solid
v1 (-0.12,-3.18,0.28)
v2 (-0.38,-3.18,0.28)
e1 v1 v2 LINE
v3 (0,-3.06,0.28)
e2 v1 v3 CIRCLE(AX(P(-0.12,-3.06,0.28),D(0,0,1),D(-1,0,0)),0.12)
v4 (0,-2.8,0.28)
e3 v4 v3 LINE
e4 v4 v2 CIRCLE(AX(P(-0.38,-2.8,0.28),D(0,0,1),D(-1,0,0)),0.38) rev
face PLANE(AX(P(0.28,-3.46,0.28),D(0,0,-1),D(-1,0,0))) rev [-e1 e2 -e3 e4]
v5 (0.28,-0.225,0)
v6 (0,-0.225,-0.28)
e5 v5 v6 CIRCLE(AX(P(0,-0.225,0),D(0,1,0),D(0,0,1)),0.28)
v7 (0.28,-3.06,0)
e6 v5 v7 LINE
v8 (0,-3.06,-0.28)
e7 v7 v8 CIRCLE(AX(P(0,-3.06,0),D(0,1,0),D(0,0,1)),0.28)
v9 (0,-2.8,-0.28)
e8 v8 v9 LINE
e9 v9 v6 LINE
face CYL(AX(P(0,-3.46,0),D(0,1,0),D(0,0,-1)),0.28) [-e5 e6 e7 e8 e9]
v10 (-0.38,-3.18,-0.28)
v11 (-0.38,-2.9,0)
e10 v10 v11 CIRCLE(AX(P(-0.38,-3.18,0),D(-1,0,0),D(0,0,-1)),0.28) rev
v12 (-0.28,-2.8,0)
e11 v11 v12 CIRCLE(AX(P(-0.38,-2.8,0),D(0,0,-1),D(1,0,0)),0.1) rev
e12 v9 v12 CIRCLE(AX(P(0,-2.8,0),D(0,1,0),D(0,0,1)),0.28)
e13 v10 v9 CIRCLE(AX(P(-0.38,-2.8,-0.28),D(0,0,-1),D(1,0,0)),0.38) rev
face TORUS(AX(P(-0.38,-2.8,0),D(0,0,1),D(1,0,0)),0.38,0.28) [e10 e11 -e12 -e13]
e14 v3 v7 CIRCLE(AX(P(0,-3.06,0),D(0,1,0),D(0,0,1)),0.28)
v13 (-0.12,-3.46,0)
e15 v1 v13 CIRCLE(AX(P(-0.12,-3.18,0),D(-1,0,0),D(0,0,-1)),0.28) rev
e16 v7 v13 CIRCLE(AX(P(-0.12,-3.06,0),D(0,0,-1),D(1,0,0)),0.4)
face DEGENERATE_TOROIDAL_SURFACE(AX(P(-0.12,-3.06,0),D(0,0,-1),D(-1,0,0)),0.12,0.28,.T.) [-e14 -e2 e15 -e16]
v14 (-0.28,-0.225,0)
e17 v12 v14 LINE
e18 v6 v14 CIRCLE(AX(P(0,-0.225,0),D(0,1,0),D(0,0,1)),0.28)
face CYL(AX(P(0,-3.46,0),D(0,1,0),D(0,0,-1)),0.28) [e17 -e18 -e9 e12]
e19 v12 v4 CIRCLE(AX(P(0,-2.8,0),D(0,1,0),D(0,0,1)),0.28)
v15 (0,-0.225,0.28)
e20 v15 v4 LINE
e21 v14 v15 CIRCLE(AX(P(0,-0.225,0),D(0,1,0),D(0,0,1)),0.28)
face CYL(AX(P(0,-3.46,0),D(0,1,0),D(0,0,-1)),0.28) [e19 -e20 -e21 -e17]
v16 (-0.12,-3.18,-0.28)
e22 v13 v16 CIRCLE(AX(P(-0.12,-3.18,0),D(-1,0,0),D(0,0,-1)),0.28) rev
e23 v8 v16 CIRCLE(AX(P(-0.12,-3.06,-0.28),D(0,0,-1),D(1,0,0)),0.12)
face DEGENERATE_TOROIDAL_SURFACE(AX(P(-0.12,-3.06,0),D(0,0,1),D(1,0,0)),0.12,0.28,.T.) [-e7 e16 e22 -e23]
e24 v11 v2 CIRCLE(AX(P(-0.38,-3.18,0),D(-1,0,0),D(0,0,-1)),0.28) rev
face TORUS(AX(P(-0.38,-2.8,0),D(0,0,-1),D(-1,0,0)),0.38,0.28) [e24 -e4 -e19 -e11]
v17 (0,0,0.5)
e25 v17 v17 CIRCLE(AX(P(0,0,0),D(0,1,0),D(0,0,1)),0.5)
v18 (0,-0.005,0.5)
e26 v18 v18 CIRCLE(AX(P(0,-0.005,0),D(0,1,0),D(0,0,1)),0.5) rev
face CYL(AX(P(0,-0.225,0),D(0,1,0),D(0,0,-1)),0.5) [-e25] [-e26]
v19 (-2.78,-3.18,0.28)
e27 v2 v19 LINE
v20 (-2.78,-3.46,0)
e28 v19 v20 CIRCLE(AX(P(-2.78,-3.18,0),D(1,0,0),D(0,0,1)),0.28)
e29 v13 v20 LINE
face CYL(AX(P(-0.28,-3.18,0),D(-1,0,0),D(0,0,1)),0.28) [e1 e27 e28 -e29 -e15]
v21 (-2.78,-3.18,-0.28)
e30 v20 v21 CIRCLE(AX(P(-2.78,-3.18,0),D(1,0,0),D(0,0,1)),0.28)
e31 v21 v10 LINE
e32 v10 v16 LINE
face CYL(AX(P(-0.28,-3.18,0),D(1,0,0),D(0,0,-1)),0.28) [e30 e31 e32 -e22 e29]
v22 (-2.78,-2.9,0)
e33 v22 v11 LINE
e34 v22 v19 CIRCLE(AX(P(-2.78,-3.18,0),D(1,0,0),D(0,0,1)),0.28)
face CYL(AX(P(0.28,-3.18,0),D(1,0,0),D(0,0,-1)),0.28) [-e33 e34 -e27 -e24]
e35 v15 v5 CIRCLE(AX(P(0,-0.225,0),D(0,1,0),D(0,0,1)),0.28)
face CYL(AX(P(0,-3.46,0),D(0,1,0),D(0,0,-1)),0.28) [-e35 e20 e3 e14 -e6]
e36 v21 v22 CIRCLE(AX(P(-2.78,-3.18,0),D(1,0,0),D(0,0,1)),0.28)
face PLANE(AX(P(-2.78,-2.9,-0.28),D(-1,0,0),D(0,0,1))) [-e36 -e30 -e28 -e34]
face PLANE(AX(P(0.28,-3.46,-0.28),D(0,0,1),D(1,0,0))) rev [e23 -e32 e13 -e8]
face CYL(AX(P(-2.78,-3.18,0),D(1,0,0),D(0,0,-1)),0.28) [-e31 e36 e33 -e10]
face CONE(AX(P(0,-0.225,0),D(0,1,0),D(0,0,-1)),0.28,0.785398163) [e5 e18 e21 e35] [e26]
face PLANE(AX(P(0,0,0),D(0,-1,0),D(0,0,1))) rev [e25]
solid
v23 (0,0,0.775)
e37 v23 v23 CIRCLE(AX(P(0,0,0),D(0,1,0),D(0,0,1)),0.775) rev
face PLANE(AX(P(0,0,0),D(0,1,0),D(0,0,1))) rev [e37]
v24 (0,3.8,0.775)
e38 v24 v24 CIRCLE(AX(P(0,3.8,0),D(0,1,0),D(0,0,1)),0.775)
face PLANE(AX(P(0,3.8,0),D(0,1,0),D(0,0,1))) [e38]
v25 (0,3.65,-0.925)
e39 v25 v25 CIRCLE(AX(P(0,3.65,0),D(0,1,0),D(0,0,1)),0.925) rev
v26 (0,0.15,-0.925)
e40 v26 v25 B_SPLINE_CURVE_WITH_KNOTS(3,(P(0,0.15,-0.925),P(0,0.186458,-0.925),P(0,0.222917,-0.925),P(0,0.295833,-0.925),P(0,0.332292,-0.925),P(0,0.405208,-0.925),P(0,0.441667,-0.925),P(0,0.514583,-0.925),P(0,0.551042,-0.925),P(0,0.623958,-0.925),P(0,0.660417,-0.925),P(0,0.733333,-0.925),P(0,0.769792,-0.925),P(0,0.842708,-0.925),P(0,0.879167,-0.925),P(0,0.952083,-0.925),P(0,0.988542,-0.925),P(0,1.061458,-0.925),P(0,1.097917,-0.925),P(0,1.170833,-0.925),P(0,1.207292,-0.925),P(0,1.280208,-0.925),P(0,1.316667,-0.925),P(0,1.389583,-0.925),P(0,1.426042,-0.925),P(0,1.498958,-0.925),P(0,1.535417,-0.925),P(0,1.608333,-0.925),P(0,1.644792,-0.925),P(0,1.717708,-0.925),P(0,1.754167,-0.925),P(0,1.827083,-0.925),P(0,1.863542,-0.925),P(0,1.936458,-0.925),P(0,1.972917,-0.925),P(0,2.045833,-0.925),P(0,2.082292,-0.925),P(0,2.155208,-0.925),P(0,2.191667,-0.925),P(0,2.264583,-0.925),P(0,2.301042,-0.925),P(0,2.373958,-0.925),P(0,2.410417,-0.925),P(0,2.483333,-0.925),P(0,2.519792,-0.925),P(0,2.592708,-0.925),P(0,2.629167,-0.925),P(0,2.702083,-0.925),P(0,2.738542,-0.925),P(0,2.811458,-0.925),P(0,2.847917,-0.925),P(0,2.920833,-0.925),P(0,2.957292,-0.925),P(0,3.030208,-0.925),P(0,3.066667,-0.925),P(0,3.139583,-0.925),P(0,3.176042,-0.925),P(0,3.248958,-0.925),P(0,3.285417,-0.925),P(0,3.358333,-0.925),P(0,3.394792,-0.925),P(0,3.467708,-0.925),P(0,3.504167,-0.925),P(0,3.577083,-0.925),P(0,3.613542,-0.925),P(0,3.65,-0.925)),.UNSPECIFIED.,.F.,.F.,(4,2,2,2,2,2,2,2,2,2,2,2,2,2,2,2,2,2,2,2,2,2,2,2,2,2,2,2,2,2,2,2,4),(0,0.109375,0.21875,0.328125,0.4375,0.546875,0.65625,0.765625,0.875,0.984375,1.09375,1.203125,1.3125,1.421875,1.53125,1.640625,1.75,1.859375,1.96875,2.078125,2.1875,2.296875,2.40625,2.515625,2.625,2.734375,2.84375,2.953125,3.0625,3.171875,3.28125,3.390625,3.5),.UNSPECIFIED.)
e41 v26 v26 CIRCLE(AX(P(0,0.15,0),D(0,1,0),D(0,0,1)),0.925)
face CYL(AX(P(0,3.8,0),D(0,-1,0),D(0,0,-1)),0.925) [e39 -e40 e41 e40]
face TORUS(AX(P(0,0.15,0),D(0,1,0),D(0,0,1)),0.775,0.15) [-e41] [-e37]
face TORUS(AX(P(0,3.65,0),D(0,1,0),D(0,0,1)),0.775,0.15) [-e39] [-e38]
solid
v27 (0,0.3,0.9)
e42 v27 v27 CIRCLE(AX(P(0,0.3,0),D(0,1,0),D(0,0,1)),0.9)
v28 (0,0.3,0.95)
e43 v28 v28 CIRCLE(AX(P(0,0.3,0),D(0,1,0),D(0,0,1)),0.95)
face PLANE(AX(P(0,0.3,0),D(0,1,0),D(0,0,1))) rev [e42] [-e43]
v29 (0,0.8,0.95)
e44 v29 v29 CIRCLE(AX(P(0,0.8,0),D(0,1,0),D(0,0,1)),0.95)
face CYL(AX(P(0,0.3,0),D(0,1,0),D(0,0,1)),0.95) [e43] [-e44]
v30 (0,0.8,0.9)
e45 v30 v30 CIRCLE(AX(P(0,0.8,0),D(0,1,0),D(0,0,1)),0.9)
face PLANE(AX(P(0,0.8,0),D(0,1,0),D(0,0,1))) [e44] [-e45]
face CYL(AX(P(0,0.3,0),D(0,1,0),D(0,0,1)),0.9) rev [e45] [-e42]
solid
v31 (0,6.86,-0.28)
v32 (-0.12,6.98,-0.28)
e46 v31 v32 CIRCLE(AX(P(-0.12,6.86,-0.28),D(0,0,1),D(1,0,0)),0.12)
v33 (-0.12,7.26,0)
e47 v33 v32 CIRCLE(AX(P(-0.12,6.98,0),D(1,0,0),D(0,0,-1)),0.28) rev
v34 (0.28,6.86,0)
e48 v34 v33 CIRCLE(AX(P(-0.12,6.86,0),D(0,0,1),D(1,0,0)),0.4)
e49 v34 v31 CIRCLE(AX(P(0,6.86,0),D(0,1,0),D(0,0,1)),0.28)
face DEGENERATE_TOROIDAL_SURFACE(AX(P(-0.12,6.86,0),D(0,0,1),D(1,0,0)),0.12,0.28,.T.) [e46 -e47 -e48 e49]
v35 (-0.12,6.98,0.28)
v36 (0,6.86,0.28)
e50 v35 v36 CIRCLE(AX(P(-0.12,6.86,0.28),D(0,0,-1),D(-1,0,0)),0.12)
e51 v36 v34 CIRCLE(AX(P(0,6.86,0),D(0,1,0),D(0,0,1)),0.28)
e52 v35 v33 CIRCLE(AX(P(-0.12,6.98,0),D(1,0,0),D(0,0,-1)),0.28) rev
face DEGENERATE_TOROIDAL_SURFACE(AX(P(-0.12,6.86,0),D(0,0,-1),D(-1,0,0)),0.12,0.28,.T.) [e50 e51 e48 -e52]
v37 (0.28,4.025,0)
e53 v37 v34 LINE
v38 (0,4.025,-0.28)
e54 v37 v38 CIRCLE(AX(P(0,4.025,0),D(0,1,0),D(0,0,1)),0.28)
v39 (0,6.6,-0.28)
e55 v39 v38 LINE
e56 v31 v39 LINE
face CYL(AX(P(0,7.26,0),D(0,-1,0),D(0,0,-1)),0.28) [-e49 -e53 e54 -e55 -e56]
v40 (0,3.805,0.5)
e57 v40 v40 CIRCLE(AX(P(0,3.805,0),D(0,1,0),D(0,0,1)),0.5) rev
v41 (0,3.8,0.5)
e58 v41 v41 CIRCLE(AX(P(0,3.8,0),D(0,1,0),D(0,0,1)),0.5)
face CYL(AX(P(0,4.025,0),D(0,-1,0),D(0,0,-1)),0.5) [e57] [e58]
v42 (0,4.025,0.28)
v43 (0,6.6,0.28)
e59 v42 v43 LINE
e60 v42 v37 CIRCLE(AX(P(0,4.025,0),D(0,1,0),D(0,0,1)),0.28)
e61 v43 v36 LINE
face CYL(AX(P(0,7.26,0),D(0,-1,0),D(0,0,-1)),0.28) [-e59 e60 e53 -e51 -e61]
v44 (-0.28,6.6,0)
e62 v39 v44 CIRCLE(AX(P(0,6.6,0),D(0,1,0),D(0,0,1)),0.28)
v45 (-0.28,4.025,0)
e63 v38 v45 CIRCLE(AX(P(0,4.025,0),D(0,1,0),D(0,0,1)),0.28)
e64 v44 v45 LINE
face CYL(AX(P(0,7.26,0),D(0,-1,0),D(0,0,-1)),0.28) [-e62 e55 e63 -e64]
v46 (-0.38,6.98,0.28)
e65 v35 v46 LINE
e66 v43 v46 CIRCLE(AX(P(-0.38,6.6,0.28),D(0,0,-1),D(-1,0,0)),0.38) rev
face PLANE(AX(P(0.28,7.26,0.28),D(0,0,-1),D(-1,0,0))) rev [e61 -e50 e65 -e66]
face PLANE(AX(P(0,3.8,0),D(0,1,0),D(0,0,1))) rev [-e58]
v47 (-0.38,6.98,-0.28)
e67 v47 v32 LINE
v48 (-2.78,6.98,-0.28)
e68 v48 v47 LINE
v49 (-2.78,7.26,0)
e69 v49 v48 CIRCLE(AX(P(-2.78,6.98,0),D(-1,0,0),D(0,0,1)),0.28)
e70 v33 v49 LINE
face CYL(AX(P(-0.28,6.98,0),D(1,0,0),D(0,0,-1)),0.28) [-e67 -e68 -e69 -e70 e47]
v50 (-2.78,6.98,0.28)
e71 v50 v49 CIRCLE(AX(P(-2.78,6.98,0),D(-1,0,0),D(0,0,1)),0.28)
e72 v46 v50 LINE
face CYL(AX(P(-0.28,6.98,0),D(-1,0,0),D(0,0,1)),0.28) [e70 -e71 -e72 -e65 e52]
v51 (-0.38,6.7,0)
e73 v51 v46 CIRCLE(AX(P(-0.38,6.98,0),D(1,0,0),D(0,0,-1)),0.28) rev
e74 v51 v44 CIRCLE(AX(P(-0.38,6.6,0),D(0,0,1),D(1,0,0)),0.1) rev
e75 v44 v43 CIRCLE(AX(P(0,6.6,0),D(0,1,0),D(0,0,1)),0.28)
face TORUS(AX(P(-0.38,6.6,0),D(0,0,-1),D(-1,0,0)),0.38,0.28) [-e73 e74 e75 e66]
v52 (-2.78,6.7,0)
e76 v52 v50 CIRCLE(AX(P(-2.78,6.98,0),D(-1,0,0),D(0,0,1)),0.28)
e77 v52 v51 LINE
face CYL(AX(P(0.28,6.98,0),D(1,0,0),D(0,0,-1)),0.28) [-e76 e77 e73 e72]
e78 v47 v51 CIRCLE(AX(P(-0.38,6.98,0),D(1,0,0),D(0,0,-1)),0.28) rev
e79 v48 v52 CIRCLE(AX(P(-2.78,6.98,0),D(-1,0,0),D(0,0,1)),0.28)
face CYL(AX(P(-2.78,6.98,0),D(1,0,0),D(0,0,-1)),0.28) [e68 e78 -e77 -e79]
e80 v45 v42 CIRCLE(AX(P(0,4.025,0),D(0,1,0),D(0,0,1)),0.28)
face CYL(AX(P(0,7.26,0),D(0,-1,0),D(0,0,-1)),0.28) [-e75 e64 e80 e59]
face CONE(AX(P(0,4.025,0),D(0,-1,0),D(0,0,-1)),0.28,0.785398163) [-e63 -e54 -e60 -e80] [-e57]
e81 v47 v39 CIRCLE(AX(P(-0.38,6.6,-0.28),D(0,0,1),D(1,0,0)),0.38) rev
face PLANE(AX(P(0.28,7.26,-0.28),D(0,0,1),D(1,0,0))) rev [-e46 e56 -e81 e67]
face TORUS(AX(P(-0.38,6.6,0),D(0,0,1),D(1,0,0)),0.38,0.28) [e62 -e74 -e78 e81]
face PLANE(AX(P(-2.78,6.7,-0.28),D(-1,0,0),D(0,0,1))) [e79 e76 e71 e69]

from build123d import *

# Parameters (mm, degrees)
SKETCH1_R           = 0.925
BOSS_EXTRUDE1_DEPTH = 3.8
SKETCH2_R           = 0.5
BOSS_EXTRUDE2_DEPTH = 0.225
CHAMFER2_SIZE       = 0.22
FILLET1_R           = 0.15
FILLET2_R           = 0.15
SKETCH8_W           = 0.56
SKETCH8_H           = 0.56
BOSS_EXTRUDE7_DEPTH = 3.235
SKETCH9_W           = 0.56
SKETCH9_H           = 0.56
BOSS_EXTRUDE8_DEPTH = 2.5
FILLET7_R           = 0.1
FILLET7_R_2         = 0.4
FILLET7_R_3         = 0.28
SKETCH10_R          = 0.95
SKETCH10_R_2        = 0.9
BOSS_EXTRUDE9_DEPTH = 0.5


with BuildPart() as part:
    # Sketch1 → Boss-Extrude1 (new body)
    with BuildSketch(Plane(origin=(0, 0, 0), x_dir=(1, 0, 0), z_dir=(0, 1, 0))):
        with Locations(Location((0, 0, 0), (0, 0, 90))):
            Circle(SKETCH1_R)
    extrude(amount=BOSS_EXTRUDE1_DEPTH)

    # Fillet1
    fillet1_edges = [part.edges().sort_by_distance(p)[0] for p in [
        (0, 3.8, 0.925),
    ]]
    fillet(fillet1_edges, radius=FILLET1_R)

    # Fillet2
    fillet2_edges = [part.edges().sort_by_distance(p)[0] for p in [
        (0, 0, 0.925),
    ]]
    fillet(fillet2_edges, radius=FILLET2_R)


with BuildPart() as body_2:
    # Sketch2 → Boss-Extrude2 (new body)
    with BuildSketch(Plane(origin=(0, 3.8, 0), x_dir=(1, 0, 0), z_dir=(0, 1, 0))):
        with Locations(Location((0, 0, 0), (0, 0, 270))):
            Circle(SKETCH2_R)
    extrude(amount=BOSS_EXTRUDE2_DEPTH)

    # Chamfer2
    chamfer2_edges = [body_2.edges().sort_by_distance(p)[0] for p in [
        (0, 4.025, -0.5),
    ]]
    chamfer(chamfer2_edges, length=CHAMFER2_SIZE)

    # Sketch8 → Boss-Extrude7 (add)
    with BuildSketch(Plane(origin=(0, 4.025, 0), x_dir=(1, 0, 0), z_dir=(0, 1, 0))):
        Rectangle(SKETCH8_W, SKETCH8_H)
    extrude(amount=BOSS_EXTRUDE7_DEPTH)

    # Sketch9 → Boss-Extrude8 (add)
    with BuildSketch(Plane.ZY.offset(0.28)):
        with Locations((0, 6.98)):
            Rectangle(SKETCH9_W, SKETCH9_H)
    extrude(amount=BOSS_EXTRUDE8_DEPTH)

    # Fillet7
    # the kernel refuses this fillet: 0.4, 0.28, 0.1 mm, written as the material it adds along each edge
    with BuildSketch(Plane(origin=(-0.28, 6.7, 0.28), x_dir=(-1, 0, 0), z_dir=(0, 0, -1))) as fillet7_piece_1:
        with BuildLine():
            CenterArc((FILLET7_R, -FILLET7_R), FILLET7_R, 90, 90)
            Line((0, -FILLET7_R), (0, 0))
            Line((0, 0), (FILLET7_R, 0))
        make_face()
    extrude(amount=0.56)
    # the kernel refuses this fillet: 0.4, 0.28, 0.1 mm, written as the material it takes off along each edge
    with BuildSketch(Plane(origin=(0.28, 7.26, -1.28), x_dir=(0, -1, 0), z_dir=(0, 0, 1))) as fillet7_2_piece_1:
        with BuildLine():
            CenterArc((FILLET7_R_2, -FILLET7_R_2), FILLET7_R_2, 90, 90)
            Line((0, -FILLET7_R_2), (0, 0))
            Line((0, 0), (FILLET7_R_2, 0))
        make_face()
    extrude(amount=2.56, mode=Mode.SUBTRACT)
    # the kernel refuses this fillet: 0.4, 0.28, 0.1 mm, written as the material it takes off along each edge
    with BuildSketch(Plane(origin=(0.28, 4.025, 0.28), x_dir=(0, 0, -1), z_dir=(0, 1, 0))) as fillet7_3_piece_1:
        with BuildLine():
            CenterArc((FILLET7_R_3, FILLET7_R_3), FILLET7_R_3, 180, 90)
            Line((0, FILLET7_R_3), (0, 0))
            Line((0, 0), (FILLET7_R_3, 0))
        make_face()
    extrude(amount=2.835, mode=Mode.SUBTRACT)
    with BuildSketch(Plane(origin=(0.28, 4.025, -0.28), x_dir=(0, 0, 1), z_dir=(0, 1, 0))) as fillet7_3_piece_2:
        with BuildLine():
            CenterArc((FILLET7_R_3, -FILLET7_R_3), FILLET7_R_3, 90, 90)
            Line((0, -FILLET7_R_3), (0, 0))
            Line((0, 0), (FILLET7_R_3, 0))
        make_face()
    extrude(amount=2.835, mode=Mode.SUBTRACT)
    with BuildSketch(Plane(origin=(-0.28, 4.025, 0.28), x_dir=(1, 0, 0), z_dir=(0, 1, 0))) as fillet7_3_piece_3:
        with BuildLine():
            CenterArc((FILLET7_R_3, FILLET7_R_3), FILLET7_R_3, 180, 90)
            Line((0, FILLET7_R_3), (0, 0))
            Line((0, 0), (FILLET7_R_3, 0))
        make_face()
    extrude(amount=2.575, mode=Mode.SUBTRACT)
    with BuildSketch(Plane(origin=(-0.38, 6.7, -0.28), x_dir=(0, 1, 0), z_dir=(-1, 0, 0))) as fillet7_3_piece_4:
        with BuildLine():
            CenterArc((FILLET7_R_3, -FILLET7_R_3), FILLET7_R_3, 90, 90)
            Line((0, -FILLET7_R_3), (0, 0))
            Line((0, 0), (FILLET7_R_3, 0))
        make_face()
    extrude(amount=3.1, mode=Mode.SUBTRACT)
    with BuildSketch(Plane(origin=(-0.12, 7.26, 0.28), x_dir=(0, -1, 0), z_dir=(-1, 0, 0)), Plane(origin=(-3.48, 7.26, -0.28), x_dir=(0, -1, 0), z_dir=(1, 0, 0))) as fillet7_3_piece_5:
        with BuildLine():
            CenterArc((FILLET7_R_3, -FILLET7_R_3), FILLET7_R_3, 90, 90)
            Line((0, -FILLET7_R_3), (0, 0))
            Line((0, 0), (FILLET7_R_3, 0))
        make_face()
    extrude(amount=3.36, mode=Mode.SUBTRACT)
    with BuildSketch(Plane(origin=(-0.28, 4.025, -0.28), x_dir=(1, 0, 0), z_dir=(0, 1, 0))) as fillet7_3_piece_6:
        with BuildLine():
            CenterArc((FILLET7_R_3, -FILLET7_R_3), FILLET7_R_3, 90, 90)
            Line((0, -FILLET7_R_3), (0, 0))
            Line((0, 0), (FILLET7_R_3, 0))
        make_face()
    extrude(amount=2.575, mode=Mode.SUBTRACT)
    with BuildSketch(Plane(origin=(-0.38, 6.7, 0.28), x_dir=(0, 1, 0), z_dir=(-1, 0, 0))) as fillet7_3_piece_7:
        with BuildLine():
            CenterArc((FILLET7_R_3, FILLET7_R_3), FILLET7_R_3, 180, 90)
            Line((0, FILLET7_R_3), (0, 0))
            Line((0, 0), (FILLET7_R_3, 0))
        make_face()
    extrude(amount=3.1, mode=Mode.SUBTRACT)
    with BuildSketch(Plane(origin=(-0.38, 6.6, 0.28), x_dir=(0, 1, 0), z_dir=(-1, 0, 0))) as fillet7_3_piece_8:
        with BuildLine():
            CenterArc((0.1 + FILLET7_R_3, FILLET7_R_3), FILLET7_R_3, 180, 90)
            Line((0.1, FILLET7_R_3), (0.1, 0))
            Line((0.1, 0), (0.1 + FILLET7_R_3, 0))
        make_face()
    revolve(axis=Axis((-0.38, 6.6, 0.28), (0, 0, -1)), revolution_arc=90, mode=Mode.SUBTRACT)
    with BuildSketch(Plane(origin=(-0.38, 6.6, -0.28), x_dir=(0, 1, 0), z_dir=(-1, 0, 0))) as fillet7_3_piece_9:
        with BuildLine():
            CenterArc((0.1 + FILLET7_R_3, -FILLET7_R_3), FILLET7_R_3, 90, 90)
            Line((0.1, -FILLET7_R_3), (0.1, 0))
            Line((0.1, 0), (0.1 + FILLET7_R_3, 0))
        make_face()
    revolve(axis=Axis((-0.38, 6.6, -0.28), (0, 0, -1)), revolution_arc=90, mode=Mode.SUBTRACT)
    with BuildSketch(Plane(origin=(-0.12, 6.86, -0.28), x_dir=(0, 1, 0), z_dir=(-1, 0, 0))) as fillet7_3_piece_10:
        with BuildLine():
            CenterArc((0.4 - FILLET7_R_3, -FILLET7_R_3), FILLET7_R_3, 360, 90)
            Line((0.4, -FILLET7_R_3), (0.4, 0))
            Line((0.4, 0), (0.4 - FILLET7_R_3, 0))
        make_face()
    revolve(axis=Axis((-0.12, 6.86, -0.28), (0, 0, -1)), revolution_arc=90, mode=Mode.SUBTRACT)
    with BuildSketch(Plane(origin=(-0.12, 6.86, 0.28), x_dir=(0, 1, 0), z_dir=(-1, 0, 0))) as fillet7_3_piece_11:
        with BuildLine():
            CenterArc((0.4 - FILLET7_R_3, FILLET7_R_3), FILLET7_R_3, 270, 90)
            Line((0.4, FILLET7_R_3), (0.4, 0))
            Line((0.4, 0), (0.4 - FILLET7_R_3, 0))
        make_face()
    revolve(axis=Axis((-0.12, 6.86, 0.28), (0, 0, -1)), revolution_arc=90, mode=Mode.SUBTRACT)


with BuildPart() as body_3:
    # Mirror1: mirrored copy
    add(body_2.part.mirror(Plane.ZX.offset(1.9)))


with BuildPart() as body_4:
    # Sketch10 → Boss-Extrude9 (new body)
    with BuildSketch(Plane(origin=(0, 0.8, 0), x_dir=(-1, 0, 0), z_dir=(0, 1, 0))):
        with Locations(Location((0, 0, 0), (0, 0, 90))):
            Circle(SKETCH10_R)
        with Locations(Location((0, 0, 0), (0, 0, 90))):
            Circle(SKETCH10_R_2, mode=Mode.SUBTRACT)
    extrude(amount=-BOSS_EXTRUDE9_DEPTH)


solid = Compound([part.part, body_2.part, body_3.part, body_4.part])
